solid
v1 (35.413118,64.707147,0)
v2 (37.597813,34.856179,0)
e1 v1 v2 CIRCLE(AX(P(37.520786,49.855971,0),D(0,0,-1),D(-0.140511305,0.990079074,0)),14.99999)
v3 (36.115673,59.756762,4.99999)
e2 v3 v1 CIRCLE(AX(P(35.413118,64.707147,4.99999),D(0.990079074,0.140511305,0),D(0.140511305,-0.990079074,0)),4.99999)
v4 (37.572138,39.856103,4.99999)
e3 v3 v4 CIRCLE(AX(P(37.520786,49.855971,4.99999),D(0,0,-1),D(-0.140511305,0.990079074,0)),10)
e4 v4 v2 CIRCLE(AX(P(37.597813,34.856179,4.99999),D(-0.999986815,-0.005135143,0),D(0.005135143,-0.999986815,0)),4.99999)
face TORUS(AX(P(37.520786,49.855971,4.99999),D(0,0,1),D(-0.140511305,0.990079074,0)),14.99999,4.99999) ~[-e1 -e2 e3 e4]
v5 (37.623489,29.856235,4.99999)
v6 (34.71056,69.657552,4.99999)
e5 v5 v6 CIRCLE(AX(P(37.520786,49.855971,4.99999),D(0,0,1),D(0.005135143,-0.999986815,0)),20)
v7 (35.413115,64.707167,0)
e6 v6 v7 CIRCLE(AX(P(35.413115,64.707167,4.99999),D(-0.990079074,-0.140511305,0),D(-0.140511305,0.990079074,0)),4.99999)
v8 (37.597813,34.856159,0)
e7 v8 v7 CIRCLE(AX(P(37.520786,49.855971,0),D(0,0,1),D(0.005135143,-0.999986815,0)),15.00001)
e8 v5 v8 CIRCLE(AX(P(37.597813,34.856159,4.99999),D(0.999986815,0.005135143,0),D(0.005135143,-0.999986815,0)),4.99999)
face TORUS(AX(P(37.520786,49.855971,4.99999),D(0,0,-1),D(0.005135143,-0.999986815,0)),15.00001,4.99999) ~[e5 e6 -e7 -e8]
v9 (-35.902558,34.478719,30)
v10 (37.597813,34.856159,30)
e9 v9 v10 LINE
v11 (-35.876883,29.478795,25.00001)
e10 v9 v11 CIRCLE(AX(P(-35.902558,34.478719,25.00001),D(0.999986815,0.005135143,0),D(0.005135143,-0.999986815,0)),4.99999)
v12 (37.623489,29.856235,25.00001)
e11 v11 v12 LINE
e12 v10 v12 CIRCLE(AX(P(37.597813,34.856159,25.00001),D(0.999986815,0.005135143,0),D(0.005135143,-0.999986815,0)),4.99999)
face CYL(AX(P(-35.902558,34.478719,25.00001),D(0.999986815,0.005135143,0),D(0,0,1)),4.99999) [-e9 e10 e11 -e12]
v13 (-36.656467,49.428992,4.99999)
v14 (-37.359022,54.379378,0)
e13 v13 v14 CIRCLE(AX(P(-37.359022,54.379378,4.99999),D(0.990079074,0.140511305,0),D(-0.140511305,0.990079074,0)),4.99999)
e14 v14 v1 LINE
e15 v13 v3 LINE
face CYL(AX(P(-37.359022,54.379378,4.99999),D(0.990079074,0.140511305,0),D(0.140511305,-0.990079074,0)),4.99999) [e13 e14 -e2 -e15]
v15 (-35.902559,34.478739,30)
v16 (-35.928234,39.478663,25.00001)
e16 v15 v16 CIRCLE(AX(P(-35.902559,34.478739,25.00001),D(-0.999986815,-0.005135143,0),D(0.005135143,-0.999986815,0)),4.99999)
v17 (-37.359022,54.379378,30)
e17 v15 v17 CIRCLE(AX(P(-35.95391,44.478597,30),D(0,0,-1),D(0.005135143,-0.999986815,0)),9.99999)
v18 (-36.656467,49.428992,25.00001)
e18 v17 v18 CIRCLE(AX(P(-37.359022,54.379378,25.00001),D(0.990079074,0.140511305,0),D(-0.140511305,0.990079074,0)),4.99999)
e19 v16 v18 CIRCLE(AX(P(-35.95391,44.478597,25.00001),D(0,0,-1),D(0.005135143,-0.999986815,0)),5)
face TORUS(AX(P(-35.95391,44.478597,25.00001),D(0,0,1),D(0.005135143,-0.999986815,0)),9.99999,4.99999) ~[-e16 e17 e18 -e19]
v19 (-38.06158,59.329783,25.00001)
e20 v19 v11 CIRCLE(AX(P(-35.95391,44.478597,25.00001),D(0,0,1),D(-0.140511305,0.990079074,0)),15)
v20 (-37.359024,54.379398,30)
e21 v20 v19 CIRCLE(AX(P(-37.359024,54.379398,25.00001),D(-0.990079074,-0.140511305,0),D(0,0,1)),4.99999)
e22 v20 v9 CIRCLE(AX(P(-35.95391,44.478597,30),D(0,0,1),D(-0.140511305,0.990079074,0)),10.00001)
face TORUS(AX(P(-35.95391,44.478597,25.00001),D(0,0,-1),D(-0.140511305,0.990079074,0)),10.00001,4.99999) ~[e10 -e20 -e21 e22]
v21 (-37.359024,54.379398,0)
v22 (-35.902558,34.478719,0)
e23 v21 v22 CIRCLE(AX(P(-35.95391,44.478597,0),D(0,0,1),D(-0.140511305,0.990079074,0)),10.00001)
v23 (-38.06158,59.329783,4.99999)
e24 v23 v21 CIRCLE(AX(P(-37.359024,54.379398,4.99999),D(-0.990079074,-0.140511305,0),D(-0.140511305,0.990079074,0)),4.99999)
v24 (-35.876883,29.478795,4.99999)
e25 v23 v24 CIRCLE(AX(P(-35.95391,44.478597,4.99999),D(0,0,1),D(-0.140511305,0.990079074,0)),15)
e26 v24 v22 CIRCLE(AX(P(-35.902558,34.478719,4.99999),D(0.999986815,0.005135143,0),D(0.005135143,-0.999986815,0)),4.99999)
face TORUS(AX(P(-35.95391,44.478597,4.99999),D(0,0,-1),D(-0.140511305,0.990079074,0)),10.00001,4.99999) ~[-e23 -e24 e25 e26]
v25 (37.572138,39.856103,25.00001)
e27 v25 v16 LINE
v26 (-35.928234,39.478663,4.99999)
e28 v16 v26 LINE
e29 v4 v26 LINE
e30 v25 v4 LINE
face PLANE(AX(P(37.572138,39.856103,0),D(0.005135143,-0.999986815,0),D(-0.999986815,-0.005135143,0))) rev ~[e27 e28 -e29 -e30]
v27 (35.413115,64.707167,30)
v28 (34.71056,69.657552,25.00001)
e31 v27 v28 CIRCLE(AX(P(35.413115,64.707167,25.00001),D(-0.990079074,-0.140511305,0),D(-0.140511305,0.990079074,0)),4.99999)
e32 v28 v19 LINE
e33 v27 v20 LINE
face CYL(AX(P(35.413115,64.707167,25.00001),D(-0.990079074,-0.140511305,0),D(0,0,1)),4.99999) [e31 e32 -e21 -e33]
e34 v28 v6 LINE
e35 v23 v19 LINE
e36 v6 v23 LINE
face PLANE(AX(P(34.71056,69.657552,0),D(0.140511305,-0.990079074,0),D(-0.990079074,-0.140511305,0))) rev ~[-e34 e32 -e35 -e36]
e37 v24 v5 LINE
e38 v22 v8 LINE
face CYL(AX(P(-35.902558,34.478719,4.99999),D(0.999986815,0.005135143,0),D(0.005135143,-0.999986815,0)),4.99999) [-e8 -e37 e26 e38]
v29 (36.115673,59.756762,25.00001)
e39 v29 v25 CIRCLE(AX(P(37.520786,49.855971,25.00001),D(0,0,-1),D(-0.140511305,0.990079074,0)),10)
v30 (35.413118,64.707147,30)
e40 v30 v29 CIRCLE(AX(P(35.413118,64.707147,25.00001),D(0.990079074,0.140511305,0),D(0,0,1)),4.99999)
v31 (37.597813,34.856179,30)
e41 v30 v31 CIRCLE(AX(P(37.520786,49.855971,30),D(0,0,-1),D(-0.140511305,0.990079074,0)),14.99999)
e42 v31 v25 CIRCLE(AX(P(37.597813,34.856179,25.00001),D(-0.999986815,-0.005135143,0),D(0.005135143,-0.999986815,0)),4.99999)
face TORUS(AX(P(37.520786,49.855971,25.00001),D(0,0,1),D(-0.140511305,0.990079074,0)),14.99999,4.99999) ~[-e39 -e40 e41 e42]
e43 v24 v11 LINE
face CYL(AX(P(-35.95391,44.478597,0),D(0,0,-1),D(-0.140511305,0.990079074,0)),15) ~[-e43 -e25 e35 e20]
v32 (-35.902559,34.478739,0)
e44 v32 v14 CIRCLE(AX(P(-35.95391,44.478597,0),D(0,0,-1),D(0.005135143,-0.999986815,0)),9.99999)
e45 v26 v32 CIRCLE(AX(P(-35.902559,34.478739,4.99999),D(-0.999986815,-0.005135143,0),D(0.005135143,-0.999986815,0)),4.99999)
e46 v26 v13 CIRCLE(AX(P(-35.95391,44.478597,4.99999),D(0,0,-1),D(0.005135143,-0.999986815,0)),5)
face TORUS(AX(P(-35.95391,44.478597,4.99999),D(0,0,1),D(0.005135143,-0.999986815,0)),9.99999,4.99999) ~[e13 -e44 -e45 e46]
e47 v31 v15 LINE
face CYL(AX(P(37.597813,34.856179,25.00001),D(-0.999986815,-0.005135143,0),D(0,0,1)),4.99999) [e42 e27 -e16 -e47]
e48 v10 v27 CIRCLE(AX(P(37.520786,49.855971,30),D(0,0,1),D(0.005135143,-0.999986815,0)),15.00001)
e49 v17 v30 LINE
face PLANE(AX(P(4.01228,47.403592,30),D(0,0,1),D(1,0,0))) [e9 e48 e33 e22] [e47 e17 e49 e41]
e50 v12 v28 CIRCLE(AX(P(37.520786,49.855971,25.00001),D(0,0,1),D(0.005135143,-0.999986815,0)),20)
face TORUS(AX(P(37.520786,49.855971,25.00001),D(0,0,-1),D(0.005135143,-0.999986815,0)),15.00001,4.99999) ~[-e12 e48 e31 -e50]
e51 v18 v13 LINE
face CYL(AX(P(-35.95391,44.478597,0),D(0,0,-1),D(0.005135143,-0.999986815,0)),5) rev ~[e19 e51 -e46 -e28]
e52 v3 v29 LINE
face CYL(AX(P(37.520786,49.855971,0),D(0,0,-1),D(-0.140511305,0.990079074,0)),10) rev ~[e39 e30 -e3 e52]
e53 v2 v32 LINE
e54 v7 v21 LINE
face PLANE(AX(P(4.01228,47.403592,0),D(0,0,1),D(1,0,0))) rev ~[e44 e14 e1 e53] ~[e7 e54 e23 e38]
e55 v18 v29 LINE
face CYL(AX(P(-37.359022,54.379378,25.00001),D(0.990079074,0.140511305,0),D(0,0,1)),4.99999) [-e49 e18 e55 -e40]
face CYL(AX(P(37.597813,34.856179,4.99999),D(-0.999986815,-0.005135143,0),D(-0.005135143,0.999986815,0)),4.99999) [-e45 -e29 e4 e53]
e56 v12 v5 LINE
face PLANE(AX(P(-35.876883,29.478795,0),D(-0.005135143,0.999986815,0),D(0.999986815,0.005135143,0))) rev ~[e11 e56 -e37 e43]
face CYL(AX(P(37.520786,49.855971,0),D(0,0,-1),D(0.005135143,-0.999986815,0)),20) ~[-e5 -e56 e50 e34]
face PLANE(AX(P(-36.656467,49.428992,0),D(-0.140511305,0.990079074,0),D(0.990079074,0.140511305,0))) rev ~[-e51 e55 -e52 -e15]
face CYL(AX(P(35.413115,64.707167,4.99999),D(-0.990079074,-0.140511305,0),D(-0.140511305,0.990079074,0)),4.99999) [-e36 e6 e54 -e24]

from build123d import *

# Parameters (mm, degrees)
F1_DEPTH = 30
F2_DEPTH = 25.4
F3_R     = 4.99999


# Not quite as in the source:
# - a fillet or chamfer is up to 0.001 mm smaller than in the source, because OpenCascade refuses the exact size


with BuildPart() as f1:
    # F0 (on Top) → F1 (new body)
    with BuildSketch(Plane.XY):
        with BuildLine():
            Line((34.7105600204, 69.6575524111), (-38.0615795526, 59.3297830847))
            ThreePointArc((-38.0615795526, 59.3297830847), (-50.9138983938, 43.3837240922), (-35.8768828371, 29.4787947456))
            Line((-35.8768828371, 29.4787947456), (37.6234889744, 29.8562346256))
            ThreePointArc((37.6234889744, 29.8562346256), (57.4674373389, 51.3158014327), (34.7105600204, 69.6575524111))
        make_face()
        with BuildLine():
            ThreePointArc((36.1156730696, 59.756761669), (47.4941117288, 50.5858861798), (37.5721375466, 39.8561027762))
            Line((37.5721375466, 39.8561027762), (-35.9282342649, 39.4786628962))
            ThreePointArc((-35.9282342649, 39.4786628962), (-40.9405727838, 44.1136393451), (-36.6564665034, 49.4289923426))
            Line((-36.6564665034, 49.4289923426), (36.1156730696, 59.756761669))
        make_face(mode=Mode.SUBTRACT)
    extrude(amount=F1_DEPTH)

    # F0 (on Top) → F2 (join)
    with BuildSketch(Plane.XY):
        with BuildLine():
            Line((34.7105600204, 69.6575524111), (-38.0615795526, 59.3297830847))
            ThreePointArc((-38.0615795526, 59.3297830847), (-50.9138983938, 43.3837240922), (-35.8768828371, 29.4787947456))
            Line((-35.8768828371, 29.4787947456), (37.6234889744, 29.8562346256))
            ThreePointArc((37.6234889744, 29.8562346256), (57.4674373389, 51.3158014327), (34.7105600204, 69.6575524111))
        make_face()
        with BuildLine():
            ThreePointArc((36.1156730696, 59.756761669), (47.4941117288, 50.5858861798), (37.5721375466, 39.8561027762))
            Line((37.5721375466, 39.8561027762), (-35.9282342649, 39.4786628962))
            ThreePointArc((-35.9282342649, 39.4786628962), (-40.9405727838, 44.1136393451), (-36.6564665034, 49.4289923426))
            Line((-36.6564665034, 49.4289923426), (36.1156730696, 59.756761669))
        make_face(mode=Mode.SUBTRACT)
    extrude(amount=F2_DEPTH)

    # F3 (radius 5 in the source; OpenCascade refuses exactly that, so slightly less here)
    f3_edges = [f1.edges().sort_by_distance(p)[0] for p in [
        (57.467437, 51.315801, 30),
        (-1.67551, 64.493668, 30),
        (-50.913898, 43.383724, 30),
        (0.873303, 29.667515, 30),
        (-40.940573, 44.113639, 30),
        (-0.270397, 54.592877, 30),
        (47.494112, 50.585886, 30),
        (0.821952, 39.667383, 30),
        (57.467437, 51.315801, 0),
        (-1.67551, 64.493668, 0),
        (-50.913898, 43.383724, 0),
        (0.873303, 29.667515, 0),
        (-40.940573, 44.113639, 0),
        (-0.270397, 54.592877, 0),
        (47.494112, 50.585886, 0),
        (0.821952, 39.667383, 0),
    ]]
    fillet(f3_edges, radius=F3_R)


solid = f1.part
